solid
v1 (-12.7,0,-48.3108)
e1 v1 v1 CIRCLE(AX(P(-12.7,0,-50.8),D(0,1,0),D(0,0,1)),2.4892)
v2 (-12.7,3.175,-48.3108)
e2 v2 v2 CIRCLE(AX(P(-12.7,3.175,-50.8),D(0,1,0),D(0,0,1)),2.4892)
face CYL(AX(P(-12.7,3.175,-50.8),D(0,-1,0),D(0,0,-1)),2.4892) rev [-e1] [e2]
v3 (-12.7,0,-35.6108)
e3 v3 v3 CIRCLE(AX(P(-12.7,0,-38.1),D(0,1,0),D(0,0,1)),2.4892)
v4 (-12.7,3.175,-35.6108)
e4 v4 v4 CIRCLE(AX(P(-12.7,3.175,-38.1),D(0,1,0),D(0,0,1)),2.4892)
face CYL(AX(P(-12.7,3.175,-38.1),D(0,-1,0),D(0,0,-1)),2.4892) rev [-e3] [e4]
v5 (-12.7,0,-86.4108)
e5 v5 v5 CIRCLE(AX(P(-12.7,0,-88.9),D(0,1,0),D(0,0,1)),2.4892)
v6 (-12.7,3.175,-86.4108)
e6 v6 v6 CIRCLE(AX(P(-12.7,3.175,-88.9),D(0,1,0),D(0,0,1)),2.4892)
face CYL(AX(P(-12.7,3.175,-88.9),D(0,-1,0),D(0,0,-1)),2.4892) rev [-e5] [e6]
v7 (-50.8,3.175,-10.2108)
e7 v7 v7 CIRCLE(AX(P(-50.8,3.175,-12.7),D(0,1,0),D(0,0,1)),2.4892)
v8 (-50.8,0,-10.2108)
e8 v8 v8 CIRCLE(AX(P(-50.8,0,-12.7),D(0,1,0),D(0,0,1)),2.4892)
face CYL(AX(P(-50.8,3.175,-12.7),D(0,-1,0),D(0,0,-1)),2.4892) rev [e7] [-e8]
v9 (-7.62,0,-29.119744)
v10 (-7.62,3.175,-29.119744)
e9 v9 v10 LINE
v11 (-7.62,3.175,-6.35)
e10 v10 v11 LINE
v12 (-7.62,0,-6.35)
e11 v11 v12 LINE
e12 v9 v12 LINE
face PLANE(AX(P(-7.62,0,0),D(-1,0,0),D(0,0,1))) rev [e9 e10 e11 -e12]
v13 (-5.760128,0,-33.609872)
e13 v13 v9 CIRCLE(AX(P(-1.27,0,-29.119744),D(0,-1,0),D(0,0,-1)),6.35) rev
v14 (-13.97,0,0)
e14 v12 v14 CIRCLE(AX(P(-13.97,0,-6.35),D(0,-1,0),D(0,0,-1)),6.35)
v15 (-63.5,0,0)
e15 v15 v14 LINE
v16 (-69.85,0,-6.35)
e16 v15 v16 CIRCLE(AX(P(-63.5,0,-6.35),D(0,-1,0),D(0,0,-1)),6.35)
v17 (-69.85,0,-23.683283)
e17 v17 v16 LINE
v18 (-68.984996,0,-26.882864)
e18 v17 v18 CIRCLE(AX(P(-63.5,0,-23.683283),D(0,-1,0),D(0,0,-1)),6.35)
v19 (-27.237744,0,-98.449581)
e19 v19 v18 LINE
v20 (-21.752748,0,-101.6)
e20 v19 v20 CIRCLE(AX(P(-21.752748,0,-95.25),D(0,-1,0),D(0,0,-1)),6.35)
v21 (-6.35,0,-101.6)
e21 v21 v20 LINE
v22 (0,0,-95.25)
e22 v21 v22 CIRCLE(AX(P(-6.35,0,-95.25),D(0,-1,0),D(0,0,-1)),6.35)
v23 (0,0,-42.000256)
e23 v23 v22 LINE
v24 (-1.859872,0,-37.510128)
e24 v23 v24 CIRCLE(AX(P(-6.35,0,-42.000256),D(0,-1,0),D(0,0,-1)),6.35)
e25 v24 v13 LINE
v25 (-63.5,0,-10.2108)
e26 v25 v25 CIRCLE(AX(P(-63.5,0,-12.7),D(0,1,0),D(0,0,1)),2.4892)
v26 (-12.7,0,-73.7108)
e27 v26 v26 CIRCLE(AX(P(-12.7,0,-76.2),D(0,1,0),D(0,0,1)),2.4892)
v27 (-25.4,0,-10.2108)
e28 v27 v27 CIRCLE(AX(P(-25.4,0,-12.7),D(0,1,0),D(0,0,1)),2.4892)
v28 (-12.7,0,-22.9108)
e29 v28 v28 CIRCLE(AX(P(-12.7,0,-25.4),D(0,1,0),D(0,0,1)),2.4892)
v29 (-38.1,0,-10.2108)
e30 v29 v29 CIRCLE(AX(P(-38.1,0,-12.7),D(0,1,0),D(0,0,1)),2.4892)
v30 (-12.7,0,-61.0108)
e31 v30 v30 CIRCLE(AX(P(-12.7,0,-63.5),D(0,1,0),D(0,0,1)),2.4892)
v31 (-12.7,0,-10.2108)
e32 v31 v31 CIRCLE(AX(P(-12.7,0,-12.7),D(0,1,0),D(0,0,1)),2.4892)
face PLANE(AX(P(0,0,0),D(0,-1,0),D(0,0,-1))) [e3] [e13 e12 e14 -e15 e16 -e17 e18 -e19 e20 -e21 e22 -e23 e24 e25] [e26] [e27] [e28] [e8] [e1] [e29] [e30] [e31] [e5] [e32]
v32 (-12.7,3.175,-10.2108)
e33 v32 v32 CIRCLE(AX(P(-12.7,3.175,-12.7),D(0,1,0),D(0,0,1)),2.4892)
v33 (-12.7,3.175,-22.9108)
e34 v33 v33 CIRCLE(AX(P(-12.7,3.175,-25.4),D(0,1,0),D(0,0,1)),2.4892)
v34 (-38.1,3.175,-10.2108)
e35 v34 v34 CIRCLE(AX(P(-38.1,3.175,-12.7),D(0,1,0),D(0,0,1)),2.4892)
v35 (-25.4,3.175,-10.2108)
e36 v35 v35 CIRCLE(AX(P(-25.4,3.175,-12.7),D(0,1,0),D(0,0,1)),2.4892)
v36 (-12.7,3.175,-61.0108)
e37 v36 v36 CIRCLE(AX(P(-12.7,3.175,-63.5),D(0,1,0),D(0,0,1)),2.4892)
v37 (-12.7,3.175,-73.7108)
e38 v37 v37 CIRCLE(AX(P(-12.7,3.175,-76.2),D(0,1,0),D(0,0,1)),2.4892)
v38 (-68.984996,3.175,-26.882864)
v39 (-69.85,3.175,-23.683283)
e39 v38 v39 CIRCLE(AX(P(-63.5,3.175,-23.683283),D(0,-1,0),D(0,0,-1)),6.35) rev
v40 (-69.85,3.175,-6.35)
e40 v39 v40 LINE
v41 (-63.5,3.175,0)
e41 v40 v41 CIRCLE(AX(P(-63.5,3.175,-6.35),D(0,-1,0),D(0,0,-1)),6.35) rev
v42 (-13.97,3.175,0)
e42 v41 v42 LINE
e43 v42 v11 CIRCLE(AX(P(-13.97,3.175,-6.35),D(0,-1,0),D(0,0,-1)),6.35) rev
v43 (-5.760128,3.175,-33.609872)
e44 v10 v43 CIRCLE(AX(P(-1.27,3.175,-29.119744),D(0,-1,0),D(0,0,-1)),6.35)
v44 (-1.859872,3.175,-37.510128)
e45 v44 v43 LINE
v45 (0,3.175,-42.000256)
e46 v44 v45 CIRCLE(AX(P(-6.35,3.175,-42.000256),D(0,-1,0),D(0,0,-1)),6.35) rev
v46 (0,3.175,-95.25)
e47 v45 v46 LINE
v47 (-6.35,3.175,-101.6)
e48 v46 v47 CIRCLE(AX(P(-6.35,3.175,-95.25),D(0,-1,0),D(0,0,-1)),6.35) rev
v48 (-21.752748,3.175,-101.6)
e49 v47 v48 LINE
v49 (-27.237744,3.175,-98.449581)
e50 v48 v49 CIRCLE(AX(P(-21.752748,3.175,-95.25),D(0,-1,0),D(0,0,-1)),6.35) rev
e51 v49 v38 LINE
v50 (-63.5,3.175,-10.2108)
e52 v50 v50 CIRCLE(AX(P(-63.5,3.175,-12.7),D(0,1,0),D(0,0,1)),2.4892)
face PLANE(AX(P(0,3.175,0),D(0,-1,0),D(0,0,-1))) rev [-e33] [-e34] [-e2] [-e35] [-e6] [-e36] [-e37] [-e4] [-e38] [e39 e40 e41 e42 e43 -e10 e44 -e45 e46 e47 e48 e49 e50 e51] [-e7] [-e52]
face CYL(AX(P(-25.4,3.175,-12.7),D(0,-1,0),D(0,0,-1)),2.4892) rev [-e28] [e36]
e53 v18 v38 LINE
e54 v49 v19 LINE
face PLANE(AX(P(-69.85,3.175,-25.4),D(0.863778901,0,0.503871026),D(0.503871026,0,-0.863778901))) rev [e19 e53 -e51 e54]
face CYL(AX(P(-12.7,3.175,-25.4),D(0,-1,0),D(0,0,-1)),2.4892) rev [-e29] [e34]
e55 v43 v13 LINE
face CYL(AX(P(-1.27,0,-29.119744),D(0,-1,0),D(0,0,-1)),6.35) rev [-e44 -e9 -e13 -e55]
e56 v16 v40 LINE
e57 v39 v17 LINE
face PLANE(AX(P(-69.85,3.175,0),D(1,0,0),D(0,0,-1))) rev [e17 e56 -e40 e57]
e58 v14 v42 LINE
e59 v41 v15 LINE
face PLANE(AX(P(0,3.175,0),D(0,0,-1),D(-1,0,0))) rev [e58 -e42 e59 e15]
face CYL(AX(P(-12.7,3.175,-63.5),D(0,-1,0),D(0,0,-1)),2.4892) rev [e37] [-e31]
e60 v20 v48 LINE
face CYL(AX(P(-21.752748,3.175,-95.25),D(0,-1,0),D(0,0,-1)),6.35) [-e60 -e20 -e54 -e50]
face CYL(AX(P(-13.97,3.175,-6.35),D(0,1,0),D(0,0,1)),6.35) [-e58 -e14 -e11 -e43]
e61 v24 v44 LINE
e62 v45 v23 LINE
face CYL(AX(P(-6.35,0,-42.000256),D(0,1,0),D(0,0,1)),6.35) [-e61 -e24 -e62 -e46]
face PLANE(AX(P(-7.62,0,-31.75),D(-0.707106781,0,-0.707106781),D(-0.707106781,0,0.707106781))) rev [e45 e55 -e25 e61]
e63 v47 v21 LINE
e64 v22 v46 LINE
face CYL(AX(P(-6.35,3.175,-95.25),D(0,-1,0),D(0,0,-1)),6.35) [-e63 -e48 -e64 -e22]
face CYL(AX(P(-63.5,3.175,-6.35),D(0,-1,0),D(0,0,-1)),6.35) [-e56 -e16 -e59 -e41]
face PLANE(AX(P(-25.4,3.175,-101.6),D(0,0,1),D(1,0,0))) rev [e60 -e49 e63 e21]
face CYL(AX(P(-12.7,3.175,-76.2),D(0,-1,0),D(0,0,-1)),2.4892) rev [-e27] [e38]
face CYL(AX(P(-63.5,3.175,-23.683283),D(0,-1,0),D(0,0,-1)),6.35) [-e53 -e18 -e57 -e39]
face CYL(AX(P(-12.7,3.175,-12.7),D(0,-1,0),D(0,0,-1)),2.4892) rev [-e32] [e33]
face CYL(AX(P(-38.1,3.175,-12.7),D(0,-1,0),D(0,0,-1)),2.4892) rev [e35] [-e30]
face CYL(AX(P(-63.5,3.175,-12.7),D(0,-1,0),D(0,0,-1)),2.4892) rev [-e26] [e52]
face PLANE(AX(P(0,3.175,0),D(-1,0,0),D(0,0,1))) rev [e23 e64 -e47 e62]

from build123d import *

# Parameters (mm, degrees)
SKETCH2_R           = 2.4892
BOSS_EXTRUDE1_DEPTH = 3.175
LPATTERN1_OUTLINE_R = 2.4892
LPATTERN1_DEPTH     = 3.175
CUT_EXTRUDE1_DEPTH  = 124.335571207
FILLET2_R           = 6.35


# Read off the part's stored shape, not the designer's step: LPattern1
with BuildPart() as part:
    # Sketch2 → Boss-Extrude1 (new body)
    with BuildSketch(Plane(origin=(0, 0, 0), x_dir=(1, 0, 0), z_dir=(0, 1, 0))):
        Polygon((0, 0), (0, 101.6), (-25.4, 101.6), (-69.85, 25.4), (-69.85, 0), align=None)
        with Locations(Location((-12.7, 12.7, 0), (0, 0, 270))):
            Circle(SKETCH2_R, mode=Mode.SUBTRACT)
    extrude(amount=BOSS_EXTRUDE1_DEPTH)

    # LPattern1 outline → LPattern1 (cut)
    with BuildSketch(Plane(origin=(0, 0, 0), x_dir=(1, 0, 0), z_dir=(0, 1, 0))):
        with Locations((-63.5, 12.7)):
            Circle(LPATTERN1_OUTLINE_R)
        with Locations((-50.8, 12.7)):
            Circle(LPATTERN1_OUTLINE_R)
        with Locations((-38.1, 12.7)):
            Circle(LPATTERN1_OUTLINE_R)
        with Locations((-25.4, 12.7)):
            Circle(LPATTERN1_OUTLINE_R)
        with Locations((-12.7, 88.9)):
            Circle(LPATTERN1_OUTLINE_R)
        with Locations((-12.7, 76.2)):
            Circle(LPATTERN1_OUTLINE_R)
        with Locations((-12.7, 63.5)):
            Circle(LPATTERN1_OUTLINE_R)
        with Locations((-12.7, 50.8)):
            Circle(LPATTERN1_OUTLINE_R)
        with Locations((-12.7, 38.1)):
            Circle(LPATTERN1_OUTLINE_R)
        with Locations((-12.7, 25.4)):
            Circle(LPATTERN1_OUTLINE_R)
    extrude(amount=LPATTERN1_DEPTH, mode=Mode.SUBTRACT)

    # Sketch3 → Cut-Extrude1 (cut, through all)
    with BuildSketch(Plane(origin=(0, 3.175, 0), x_dir=(1, 0, 0), z_dir=(0, 1, 0))):
        Polygon((-7.62, 31.75), (0, 39.37), (0, 31.75), (0, 0), (-7.62, 0), align=None)
    extrude(amount=-CUT_EXTRUDE1_DEPTH, mode=Mode.SUBTRACT)

    # Fillet2
    fillet2_edges = [part.edges().sort_by_distance(p)[0] for p in [
        (-7.62, 1.5875, 0),
        (-7.62, 1.5875, -31.75),
        (0, 1.5875, -39.37),
        (-69.85, 1.5875, 0),
        (-69.85, 1.5875, -25.4),
        (-25.4, 1.5875, -101.6),
        (0, 1.5875, -101.6),
    ]]
    fillet(fillet2_edges, radius=FILLET2_R)


solid = part.part
